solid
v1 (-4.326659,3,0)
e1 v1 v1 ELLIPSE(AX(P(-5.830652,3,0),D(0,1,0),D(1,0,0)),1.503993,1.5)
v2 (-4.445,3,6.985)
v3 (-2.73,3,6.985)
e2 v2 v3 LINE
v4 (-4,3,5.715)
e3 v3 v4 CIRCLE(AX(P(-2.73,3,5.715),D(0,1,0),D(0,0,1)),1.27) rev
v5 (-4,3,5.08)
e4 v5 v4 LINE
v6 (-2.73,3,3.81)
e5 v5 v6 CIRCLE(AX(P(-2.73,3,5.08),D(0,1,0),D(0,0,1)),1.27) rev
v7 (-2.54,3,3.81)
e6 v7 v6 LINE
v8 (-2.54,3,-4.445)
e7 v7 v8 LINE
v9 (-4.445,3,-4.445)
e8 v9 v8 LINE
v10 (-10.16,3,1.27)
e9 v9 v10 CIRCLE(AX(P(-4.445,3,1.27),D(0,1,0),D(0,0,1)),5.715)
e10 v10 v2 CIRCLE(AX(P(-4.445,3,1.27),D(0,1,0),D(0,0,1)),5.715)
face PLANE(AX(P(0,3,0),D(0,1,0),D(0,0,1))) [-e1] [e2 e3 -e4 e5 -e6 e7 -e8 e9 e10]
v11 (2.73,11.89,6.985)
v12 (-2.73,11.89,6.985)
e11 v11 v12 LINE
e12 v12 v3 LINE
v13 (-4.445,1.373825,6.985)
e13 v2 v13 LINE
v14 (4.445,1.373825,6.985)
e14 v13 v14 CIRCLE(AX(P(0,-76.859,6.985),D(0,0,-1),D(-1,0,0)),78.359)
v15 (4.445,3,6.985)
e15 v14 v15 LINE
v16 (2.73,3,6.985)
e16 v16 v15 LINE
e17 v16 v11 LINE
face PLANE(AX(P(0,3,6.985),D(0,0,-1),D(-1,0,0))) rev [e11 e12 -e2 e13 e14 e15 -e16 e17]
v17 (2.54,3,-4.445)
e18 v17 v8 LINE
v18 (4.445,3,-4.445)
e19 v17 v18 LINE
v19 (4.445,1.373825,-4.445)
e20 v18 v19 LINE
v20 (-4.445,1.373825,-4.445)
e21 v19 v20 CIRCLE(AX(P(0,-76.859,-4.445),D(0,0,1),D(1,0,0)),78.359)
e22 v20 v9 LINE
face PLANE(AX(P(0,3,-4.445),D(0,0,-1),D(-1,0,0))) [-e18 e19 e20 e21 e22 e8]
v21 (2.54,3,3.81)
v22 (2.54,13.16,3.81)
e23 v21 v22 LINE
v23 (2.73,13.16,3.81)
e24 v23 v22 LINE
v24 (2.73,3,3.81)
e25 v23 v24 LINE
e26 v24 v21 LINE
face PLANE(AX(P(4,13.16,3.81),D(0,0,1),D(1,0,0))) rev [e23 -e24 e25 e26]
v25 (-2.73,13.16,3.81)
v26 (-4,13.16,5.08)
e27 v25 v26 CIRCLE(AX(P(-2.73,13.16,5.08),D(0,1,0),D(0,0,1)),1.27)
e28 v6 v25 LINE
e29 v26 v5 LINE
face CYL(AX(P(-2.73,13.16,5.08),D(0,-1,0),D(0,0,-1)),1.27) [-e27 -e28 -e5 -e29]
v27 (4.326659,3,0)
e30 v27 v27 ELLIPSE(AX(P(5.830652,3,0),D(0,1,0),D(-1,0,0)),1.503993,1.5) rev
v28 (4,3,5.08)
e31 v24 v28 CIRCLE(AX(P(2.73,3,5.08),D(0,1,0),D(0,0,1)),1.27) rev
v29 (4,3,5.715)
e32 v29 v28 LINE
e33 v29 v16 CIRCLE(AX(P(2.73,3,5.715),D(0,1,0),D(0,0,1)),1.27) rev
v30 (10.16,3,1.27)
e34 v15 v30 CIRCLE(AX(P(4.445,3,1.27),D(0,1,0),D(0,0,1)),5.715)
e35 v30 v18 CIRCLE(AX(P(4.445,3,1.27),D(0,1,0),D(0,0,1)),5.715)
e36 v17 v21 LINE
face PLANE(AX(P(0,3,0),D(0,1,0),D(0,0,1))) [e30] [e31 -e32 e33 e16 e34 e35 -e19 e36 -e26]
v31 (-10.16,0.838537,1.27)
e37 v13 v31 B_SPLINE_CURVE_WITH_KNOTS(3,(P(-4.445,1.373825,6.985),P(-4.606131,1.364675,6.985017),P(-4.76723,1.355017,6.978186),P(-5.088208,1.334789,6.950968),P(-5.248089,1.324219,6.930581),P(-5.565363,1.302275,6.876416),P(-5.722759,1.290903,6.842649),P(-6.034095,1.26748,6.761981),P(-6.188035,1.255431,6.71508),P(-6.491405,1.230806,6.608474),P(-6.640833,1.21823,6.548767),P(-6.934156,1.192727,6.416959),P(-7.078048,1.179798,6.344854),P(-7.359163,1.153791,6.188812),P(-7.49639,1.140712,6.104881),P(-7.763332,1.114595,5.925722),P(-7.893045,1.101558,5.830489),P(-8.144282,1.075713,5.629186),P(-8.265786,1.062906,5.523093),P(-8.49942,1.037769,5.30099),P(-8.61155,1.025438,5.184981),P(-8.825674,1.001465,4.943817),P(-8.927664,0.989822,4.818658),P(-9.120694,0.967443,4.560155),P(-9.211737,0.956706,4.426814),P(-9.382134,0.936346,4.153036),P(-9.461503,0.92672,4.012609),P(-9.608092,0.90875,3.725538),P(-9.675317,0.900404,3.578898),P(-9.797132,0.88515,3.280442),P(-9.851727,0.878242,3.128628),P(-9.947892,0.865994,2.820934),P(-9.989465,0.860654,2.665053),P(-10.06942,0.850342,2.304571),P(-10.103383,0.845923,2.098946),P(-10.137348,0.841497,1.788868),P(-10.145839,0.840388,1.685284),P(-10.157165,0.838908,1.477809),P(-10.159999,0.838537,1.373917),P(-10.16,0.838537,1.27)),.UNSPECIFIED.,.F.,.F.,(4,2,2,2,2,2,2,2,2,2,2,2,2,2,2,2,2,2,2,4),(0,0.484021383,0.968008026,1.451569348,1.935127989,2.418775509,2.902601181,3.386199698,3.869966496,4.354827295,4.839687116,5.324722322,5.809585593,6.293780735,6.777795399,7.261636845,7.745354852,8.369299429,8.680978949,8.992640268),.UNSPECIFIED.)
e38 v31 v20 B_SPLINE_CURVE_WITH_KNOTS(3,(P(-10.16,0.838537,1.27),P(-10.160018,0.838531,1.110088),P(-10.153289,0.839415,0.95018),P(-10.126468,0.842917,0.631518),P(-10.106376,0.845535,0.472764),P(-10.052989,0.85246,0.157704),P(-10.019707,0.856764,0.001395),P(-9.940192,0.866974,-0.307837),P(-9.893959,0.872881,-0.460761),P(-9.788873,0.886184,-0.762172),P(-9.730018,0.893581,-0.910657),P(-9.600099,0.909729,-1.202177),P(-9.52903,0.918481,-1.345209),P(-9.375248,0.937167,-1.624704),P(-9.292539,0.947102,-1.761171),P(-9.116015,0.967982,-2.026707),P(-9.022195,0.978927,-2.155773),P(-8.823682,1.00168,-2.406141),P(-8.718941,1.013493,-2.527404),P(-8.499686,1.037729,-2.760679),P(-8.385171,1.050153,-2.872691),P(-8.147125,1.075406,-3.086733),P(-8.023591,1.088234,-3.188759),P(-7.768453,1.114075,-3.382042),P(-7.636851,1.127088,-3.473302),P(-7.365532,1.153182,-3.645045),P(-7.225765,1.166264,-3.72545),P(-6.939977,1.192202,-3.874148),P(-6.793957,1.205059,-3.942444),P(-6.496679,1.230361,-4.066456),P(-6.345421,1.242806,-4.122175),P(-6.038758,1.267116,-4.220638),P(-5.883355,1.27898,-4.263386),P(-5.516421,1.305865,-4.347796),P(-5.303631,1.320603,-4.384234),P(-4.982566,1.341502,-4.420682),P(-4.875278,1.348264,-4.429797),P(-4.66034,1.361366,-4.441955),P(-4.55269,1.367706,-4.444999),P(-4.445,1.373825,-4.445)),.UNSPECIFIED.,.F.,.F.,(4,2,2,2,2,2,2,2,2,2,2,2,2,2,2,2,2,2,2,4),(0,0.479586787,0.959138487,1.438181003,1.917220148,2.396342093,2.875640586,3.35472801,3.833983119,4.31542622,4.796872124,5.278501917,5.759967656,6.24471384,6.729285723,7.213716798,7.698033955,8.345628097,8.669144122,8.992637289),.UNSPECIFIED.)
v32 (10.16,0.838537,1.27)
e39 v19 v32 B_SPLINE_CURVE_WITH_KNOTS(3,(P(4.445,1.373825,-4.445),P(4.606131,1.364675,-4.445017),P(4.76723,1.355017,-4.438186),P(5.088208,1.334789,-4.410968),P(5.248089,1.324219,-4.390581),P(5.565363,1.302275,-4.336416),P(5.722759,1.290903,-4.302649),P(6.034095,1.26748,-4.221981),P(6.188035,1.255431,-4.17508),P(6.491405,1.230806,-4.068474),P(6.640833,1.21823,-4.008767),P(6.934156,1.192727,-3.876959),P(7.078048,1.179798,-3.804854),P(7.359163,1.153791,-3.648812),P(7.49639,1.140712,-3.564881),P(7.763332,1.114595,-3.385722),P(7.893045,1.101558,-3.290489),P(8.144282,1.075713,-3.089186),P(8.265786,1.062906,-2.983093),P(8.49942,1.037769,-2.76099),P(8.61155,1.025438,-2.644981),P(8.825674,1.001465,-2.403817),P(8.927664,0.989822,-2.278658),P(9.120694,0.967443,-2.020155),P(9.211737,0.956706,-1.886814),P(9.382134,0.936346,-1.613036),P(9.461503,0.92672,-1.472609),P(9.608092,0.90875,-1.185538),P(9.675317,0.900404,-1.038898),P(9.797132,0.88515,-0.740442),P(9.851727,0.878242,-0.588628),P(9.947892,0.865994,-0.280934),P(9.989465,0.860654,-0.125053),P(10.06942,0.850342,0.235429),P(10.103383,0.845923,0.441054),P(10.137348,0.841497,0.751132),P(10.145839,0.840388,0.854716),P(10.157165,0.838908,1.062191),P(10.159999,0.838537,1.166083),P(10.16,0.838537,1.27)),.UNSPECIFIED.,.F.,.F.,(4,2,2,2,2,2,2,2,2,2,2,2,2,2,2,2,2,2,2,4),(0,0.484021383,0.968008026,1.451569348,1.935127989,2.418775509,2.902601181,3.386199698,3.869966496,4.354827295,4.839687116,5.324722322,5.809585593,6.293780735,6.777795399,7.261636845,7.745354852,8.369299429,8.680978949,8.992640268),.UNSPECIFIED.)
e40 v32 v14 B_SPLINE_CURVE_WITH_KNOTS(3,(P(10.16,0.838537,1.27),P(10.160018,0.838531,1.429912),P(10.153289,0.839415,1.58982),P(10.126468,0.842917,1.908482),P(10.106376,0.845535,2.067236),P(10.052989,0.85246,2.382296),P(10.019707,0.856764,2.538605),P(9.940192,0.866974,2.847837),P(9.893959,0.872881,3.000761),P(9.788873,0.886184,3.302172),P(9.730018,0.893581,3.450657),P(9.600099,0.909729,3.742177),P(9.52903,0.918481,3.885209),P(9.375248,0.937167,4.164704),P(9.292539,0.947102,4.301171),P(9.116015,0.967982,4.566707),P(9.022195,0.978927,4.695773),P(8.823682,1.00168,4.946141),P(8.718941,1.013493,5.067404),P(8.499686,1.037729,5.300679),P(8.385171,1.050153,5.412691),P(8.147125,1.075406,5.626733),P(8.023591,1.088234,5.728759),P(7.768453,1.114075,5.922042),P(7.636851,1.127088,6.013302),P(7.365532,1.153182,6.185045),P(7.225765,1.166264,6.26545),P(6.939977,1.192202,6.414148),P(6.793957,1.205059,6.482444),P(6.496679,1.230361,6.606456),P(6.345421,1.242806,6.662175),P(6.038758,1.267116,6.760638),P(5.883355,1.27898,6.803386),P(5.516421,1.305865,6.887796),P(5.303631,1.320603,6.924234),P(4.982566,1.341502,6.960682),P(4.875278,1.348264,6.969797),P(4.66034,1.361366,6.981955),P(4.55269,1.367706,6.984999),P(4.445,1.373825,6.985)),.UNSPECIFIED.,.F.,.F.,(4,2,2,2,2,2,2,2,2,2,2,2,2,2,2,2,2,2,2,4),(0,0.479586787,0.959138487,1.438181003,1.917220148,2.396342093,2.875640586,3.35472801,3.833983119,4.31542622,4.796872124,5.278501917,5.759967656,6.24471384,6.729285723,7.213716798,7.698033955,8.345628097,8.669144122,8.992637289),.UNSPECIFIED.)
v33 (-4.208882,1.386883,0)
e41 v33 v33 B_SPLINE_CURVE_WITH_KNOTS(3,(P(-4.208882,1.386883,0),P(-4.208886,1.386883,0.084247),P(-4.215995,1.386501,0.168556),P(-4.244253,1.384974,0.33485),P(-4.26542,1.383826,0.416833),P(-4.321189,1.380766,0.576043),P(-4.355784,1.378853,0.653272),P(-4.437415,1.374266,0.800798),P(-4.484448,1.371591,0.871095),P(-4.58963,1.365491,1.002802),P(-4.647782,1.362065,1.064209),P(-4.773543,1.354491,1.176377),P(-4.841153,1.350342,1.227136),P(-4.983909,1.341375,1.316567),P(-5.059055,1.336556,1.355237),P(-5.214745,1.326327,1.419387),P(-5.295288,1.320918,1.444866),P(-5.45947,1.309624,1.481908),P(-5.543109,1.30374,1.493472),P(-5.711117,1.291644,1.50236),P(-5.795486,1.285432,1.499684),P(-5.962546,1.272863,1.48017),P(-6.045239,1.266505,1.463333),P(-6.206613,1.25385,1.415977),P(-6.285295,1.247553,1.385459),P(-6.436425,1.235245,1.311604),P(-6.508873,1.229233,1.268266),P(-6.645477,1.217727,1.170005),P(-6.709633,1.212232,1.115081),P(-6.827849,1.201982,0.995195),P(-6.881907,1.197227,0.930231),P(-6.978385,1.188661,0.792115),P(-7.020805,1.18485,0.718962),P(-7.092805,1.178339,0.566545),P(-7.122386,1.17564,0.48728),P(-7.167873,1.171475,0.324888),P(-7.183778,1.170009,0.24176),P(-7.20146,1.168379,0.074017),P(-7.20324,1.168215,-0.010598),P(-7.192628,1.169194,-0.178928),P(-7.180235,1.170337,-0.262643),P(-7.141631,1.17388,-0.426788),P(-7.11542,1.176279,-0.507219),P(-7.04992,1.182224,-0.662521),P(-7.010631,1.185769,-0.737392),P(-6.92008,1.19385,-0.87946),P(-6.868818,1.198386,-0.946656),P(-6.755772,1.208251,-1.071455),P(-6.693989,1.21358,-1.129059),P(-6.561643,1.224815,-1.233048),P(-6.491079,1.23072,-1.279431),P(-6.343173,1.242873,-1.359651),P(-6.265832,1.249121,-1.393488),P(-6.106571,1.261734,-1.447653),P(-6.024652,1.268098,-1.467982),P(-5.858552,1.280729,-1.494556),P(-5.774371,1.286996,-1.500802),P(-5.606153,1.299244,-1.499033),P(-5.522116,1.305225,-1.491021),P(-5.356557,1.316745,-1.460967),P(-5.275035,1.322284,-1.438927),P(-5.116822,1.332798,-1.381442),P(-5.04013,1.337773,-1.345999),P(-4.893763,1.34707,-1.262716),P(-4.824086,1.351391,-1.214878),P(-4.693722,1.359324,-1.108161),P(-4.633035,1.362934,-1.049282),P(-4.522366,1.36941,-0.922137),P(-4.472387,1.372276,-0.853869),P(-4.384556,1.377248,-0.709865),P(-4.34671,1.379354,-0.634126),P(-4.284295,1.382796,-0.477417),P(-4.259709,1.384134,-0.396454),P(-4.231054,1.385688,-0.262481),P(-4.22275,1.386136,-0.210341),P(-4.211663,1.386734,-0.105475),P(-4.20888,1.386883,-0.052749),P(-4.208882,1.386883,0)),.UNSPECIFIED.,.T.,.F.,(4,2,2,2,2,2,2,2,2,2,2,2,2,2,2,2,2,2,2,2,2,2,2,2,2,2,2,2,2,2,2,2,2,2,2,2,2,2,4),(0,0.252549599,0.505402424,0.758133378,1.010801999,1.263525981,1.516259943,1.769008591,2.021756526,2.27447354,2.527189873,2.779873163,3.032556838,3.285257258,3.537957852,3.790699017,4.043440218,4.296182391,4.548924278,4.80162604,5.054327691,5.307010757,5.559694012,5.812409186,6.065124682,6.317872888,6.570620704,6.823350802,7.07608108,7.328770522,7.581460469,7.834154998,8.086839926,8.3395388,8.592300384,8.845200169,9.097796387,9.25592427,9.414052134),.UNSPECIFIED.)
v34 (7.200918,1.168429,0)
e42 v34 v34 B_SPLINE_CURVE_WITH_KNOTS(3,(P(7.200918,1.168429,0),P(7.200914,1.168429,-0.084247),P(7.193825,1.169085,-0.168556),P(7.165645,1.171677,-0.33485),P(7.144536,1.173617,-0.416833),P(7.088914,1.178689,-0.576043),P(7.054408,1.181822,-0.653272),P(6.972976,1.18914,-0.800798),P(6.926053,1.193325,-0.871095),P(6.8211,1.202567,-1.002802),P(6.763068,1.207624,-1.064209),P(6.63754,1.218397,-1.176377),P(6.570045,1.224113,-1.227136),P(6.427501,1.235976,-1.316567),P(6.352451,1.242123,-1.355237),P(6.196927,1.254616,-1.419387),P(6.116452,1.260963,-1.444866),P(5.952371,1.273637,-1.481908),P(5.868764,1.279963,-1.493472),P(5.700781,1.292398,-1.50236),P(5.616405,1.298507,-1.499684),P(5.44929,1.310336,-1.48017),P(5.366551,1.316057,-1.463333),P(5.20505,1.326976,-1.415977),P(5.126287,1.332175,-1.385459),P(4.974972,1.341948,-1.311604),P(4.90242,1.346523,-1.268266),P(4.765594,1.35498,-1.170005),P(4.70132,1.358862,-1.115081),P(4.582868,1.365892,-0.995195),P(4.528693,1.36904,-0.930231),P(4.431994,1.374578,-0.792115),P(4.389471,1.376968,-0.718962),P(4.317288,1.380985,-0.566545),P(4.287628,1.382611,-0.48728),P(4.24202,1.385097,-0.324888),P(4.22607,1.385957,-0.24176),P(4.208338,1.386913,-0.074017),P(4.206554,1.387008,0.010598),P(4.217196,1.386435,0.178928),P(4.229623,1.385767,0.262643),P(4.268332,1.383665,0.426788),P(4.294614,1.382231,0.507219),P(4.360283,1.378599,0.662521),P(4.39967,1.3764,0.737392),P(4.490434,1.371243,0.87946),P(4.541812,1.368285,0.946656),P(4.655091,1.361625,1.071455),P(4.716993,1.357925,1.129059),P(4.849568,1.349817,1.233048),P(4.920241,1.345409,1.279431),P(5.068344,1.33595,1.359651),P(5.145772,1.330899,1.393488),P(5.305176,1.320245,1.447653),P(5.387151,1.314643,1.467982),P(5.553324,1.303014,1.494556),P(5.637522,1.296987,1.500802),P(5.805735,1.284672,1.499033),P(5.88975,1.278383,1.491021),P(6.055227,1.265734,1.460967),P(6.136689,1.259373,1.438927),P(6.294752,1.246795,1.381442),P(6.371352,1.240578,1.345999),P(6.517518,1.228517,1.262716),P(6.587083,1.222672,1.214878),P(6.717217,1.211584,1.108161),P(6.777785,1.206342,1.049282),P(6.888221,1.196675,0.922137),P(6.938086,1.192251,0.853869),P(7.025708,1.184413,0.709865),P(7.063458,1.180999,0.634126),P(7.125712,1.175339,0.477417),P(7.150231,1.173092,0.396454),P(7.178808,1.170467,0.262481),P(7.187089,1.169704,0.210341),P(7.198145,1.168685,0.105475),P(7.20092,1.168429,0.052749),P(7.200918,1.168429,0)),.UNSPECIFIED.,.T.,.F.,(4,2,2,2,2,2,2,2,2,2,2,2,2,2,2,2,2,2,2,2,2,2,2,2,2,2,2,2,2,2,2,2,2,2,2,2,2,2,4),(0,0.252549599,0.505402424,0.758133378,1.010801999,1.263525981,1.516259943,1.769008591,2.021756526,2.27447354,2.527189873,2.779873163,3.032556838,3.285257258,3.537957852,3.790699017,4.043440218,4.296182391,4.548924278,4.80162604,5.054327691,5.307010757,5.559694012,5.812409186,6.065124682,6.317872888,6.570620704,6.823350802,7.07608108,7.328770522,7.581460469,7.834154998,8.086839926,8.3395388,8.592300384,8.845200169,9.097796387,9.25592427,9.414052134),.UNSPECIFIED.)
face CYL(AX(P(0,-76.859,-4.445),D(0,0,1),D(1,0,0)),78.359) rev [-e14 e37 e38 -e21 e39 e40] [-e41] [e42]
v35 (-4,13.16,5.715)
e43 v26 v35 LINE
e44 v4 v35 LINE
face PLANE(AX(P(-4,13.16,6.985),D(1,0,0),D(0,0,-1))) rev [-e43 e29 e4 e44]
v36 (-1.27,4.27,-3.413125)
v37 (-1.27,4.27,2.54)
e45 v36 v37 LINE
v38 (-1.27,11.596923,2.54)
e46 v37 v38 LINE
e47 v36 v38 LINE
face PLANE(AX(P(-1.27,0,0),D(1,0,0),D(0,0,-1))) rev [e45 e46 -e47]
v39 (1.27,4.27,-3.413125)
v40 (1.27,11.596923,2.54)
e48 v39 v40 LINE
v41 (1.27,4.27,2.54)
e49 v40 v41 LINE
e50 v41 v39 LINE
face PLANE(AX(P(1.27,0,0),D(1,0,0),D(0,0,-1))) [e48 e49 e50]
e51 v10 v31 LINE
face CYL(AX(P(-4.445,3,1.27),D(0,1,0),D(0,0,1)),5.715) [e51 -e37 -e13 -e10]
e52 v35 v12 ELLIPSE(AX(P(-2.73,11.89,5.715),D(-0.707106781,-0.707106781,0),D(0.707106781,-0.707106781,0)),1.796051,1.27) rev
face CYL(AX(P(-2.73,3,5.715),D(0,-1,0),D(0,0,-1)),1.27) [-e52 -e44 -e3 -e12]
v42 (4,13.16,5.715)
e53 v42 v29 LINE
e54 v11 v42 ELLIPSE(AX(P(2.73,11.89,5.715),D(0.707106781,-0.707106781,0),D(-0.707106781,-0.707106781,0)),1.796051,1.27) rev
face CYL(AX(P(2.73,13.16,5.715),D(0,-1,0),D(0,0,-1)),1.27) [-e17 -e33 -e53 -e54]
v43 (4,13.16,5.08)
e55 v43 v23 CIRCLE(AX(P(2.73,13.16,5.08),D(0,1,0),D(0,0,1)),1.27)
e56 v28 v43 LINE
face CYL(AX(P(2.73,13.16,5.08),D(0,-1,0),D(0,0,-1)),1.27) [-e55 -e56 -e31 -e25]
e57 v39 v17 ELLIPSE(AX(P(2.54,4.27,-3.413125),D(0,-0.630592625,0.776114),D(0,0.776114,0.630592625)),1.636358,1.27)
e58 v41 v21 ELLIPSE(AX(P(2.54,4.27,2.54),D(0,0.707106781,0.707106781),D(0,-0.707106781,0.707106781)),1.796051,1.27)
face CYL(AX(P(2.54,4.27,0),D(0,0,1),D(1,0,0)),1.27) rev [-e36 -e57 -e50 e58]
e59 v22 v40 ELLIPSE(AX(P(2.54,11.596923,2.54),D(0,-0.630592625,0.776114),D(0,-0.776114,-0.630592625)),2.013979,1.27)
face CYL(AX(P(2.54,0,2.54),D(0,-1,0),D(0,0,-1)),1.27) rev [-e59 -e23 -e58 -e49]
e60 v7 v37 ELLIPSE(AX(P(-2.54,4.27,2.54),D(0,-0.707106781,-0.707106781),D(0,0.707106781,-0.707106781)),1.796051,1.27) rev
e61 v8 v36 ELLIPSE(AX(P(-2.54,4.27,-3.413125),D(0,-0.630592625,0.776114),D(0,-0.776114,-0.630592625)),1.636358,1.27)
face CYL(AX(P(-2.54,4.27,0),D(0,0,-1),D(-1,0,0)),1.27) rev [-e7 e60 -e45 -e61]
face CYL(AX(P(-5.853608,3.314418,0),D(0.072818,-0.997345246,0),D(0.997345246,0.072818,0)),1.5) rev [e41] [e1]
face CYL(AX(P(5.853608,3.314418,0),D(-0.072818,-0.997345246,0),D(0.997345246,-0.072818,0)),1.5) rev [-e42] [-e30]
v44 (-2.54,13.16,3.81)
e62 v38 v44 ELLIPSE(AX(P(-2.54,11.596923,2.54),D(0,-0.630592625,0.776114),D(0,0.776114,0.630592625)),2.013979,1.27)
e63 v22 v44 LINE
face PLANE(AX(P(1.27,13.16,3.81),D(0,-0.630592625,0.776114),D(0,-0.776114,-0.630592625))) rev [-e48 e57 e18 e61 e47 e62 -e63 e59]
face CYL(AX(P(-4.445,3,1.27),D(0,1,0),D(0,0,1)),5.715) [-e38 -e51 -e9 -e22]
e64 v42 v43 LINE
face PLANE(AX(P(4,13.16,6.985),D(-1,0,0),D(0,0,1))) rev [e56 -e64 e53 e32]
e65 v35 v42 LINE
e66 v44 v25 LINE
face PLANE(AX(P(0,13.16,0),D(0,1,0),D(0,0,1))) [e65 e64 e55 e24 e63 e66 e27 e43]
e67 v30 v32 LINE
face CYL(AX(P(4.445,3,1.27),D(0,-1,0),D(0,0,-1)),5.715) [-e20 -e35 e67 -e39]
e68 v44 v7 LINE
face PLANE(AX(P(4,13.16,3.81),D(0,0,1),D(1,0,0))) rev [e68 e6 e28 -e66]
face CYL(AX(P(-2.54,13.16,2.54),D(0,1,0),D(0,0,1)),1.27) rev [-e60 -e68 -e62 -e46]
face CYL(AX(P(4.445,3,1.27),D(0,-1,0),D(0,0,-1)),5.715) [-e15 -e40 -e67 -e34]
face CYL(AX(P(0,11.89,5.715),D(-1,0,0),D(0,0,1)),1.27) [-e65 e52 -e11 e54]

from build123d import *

# Parameters (mm, degrees)
SKETCH1_W               = 20.32
SKETCH1_H               = 23.8125
BOSS_EXTRUDE1_DEPTH     = 3
SKETCH3_R               = 1.500000048
CUT_EXTRUDE1_DEPTH      = 84.279291716
CUT_EXTRUDE2_DEPTH      = 23.075453704
CUT_EXTRUDE2_DEPTH_BACK = 23.075453704
SKETCH2_R               = 78.359
SKETCH4_W               = 22.86
SKETCH4_H               = 20.306074834
CUT_EXTRUDE3_DEPTH      = 12.3825
SKETCH9_W               = 8
SKETCH9_H               = 3.175
BOSS_EXTRUDE2_DEPTH     = 10.16
BOSS_EXTRUDE3_DEPTH     = 1.27
FILLET7_R               = 5.715
FILLET8_R               = 1.27
FILLET9_R               = 1.27


# Some blends are built 0.0001 mm under size
with BuildPart() as part:
    # Sketch1 → Boss-Extrude1 (new body)
    with BuildSketch(Plane(origin=(0, 0, 0), x_dir=(1, 0, 0), z_dir=(0, 1, 0))):
        with Locations((0, -7.46125)):
            Rectangle(SKETCH1_W, SKETCH1_H)
        Polygon((3.9, -10.985), (6, -10.985), (6, -13.985), (2.999999969, -13.985), (2.999999969, -17.16), (-2.999999969, -17.16), (-2.999999969, -13.985), (-6, -13.985), (-6, -10.985), (-3.9, -10.985), (-3.9, -6.985), (3.9, -6.985), align=None, mode=Mode.SUBTRACT)
    extrude(amount=BOSS_EXTRUDE1_DEPTH)

    # Sketch3 → Cut-Extrude1 (cut, through all)
    with BuildSketch(Plane(origin=(-5.581860717, -76.451458097, 0), x_dir=(0, 0, 1), z_dir=(0.07281799962939917, 0.9973452456045363, 0))):
        with Locations(Location((0, 5.59671863, 0), (0, 0, 270))):
            Circle(SKETCH3_R)
    cut_extrude1 = extrude(amount=CUT_EXTRUDE1_DEPTH, mode=Mode.SUBTRACT)

    # Mirror1: Cut-Extrude1 across plane
    add(cut_extrude1.mirror(Plane(origin=(0, 0, 0), x_dir=(0, 0, 1), z_dir=(1, 0, 0))), mode=Mode.SUBTRACT)

    # Sketch2 → Cut-Extrude2 (cut, two sides: drawn at the far end of the back side and taken through both)
    with BuildSketch(Plane.XY.offset(-CUT_EXTRUDE2_DEPTH_BACK)):
        with Locations((0, -76.858999952)):
            Circle(SKETCH2_R)
    extrude(amount=CUT_EXTRUDE2_DEPTH + CUT_EXTRUDE2_DEPTH_BACK, mode=Mode.SUBTRACT)

    # Sketch4 → Cut-Extrude3 (cut)
    with BuildSketch(Plane.XY.offset(19.3675)):
        with Locations((-1.27, 10.991574627)):
            Rectangle(SKETCH4_W, SKETCH4_H)
    extrude(amount=-CUT_EXTRUDE3_DEPTH, mode=Mode.SUBTRACT)

    # Sketch9 → Boss-Extrude2 (add)
    with BuildSketch(Plane(origin=(0, 3, 0), x_dir=(1, 0, 0), z_dir=(0, 1, 0))):
        with Locations((0, -5.3975)):
            Rectangle(SKETCH9_W, SKETCH9_H)
    extrude(amount=BOSS_EXTRUDE2_DEPTH)

    # Sketch10 → Boss-Extrude3 (add, symmetric)
    with BuildSketch(Plane(origin=(0, 0, 0), x_dir=(0, 0, -1), z_dir=(1, 0, 0))):
        Polygon((-3.81, 13.16), (4.445, 3), (-3.81, 3), align=None)
    extrude(amount=BOSS_EXTRUDE3_DEPTH, both=True)

    # Fillet7
    fillet7_edges = [part.edges().sort_by_distance(p)[0] for p in [
        (-10.16, 1.919268605, 6.985),
        (-10.16, 1.919268605, -4.445),
        (10.16, 1.919268605, -4.445),
        (10.16, 1.919268605, 6.985),
    ]]
    fillet(fillet7_edges, radius=FILLET7_R - 0.0001)  # a hair under: the kernel refuses the full size

    # Fillet8
    fillet8_edges = [part.edges().sort_by_distance(p)[0] for p in [
        (4, 8.08, 6.985),
        (4, 8.08, 3.81),
        (-4, 8.08, 3.81),
        (-4, 8.08, 6.985),
        (0, 13.16, 6.985),
    ]]
    fillet(fillet8_edges, radius=FILLET8_R)

    # Fillet9
    # the kernel refuses this fillet: 1.27 mm, written as the material it adds along each edge
    with BuildSketch(Plane(origin=(-1.27, 3, 3.81), x_dir=(0, 0, -1), z_dir=(0, 1, 0))) as fillet9_piece_1_section:
        with BuildLine():
            CenterArc((FILLET9_R, FILLET9_R), FILLET9_R, 180, 90)
            Line((0, FILLET9_R), (0, 0))
            Line((0, 0), (FILLET9_R, 0))
        make_face()
    fillet9_piece_1 = extrude(amount=10.16, mode=Mode.PRIVATE)
    fillet9_piece_1 = split(fillet9_piece_1, bisect_by=Plane(origin=(-1.56303802, 9.860421862, 1.129092762), z_dir=(0, -0.630592625094466, 0.7761140001162654)), keep=Keep.TOP, mode=Mode.PRIVATE)
    add(fillet9_piece_1)
    with BuildSketch(Plane(origin=(-1.27, 3, -4.445), x_dir=(-1, 0, 0), z_dir=(0, 0, 1))) as fillet9_piece_2_section:
        with BuildLine():
            CenterArc((FILLET9_R, -FILLET9_R), FILLET9_R, 90, 90)
            Line((0, -FILLET9_R), (0, 0))
            Line((0, 0), (FILLET9_R, 0))
        make_face()
    fillet9_piece_2 = extrude(amount=11.43, mode=Mode.PRIVATE)
    fillet9_piece_2 = split(fillet9_piece_2, bisect_by=Plane(origin=(-1.561973496, 5.244551774, -2.621301684), z_dir=(0, -0.630592625094466, 0.7761140001162654)), keep=Keep.TOP, mode=Mode.PRIVATE)
    add(fillet9_piece_2)
    with BuildSketch(Plane(origin=(1.27, 3, 3.81), x_dir=(0, 0, -1), z_dir=(0, 1, 0))) as fillet9_piece_3_section:
        with BuildLine():
            CenterArc((FILLET9_R, -FILLET9_R), FILLET9_R, 90, 90)
            Line((0, -FILLET9_R), (0, 0))
            Line((0, 0), (FILLET9_R, 0))
        make_face()
    fillet9_piece_3 = extrude(amount=10.16, mode=Mode.PRIVATE)
    fillet9_piece_3 = split(fillet9_piece_3, bisect_by=Plane(origin=(1.56303802, 9.860421862, 1.129092762), z_dir=(0, -0.630592625094466, 0.7761140001162654)), keep=Keep.TOP, mode=Mode.PRIVATE)
    add(fillet9_piece_3)
    with BuildSketch(Plane(origin=(1.27, 3, -4.445), x_dir=(1, 0, 0), z_dir=(0, 0, 1))) as fillet9_piece_4_section:
        with BuildLine():
            CenterArc((FILLET9_R, FILLET9_R), FILLET9_R, 180, 90)
            Line((0, FILLET9_R), (0, 0))
            Line((0, 0), (FILLET9_R, 0))
        make_face()
    fillet9_piece_4 = extrude(amount=11.43, mode=Mode.PRIVATE)
    fillet9_piece_4 = split(fillet9_piece_4, bisect_by=Plane(origin=(1.561973496, 5.244551774, -2.621301684), z_dir=(0, -0.630592625094466, 0.7761140001162654)), keep=Keep.TOP, mode=Mode.PRIVATE)
    add(fillet9_piece_4)


solid = part.part
